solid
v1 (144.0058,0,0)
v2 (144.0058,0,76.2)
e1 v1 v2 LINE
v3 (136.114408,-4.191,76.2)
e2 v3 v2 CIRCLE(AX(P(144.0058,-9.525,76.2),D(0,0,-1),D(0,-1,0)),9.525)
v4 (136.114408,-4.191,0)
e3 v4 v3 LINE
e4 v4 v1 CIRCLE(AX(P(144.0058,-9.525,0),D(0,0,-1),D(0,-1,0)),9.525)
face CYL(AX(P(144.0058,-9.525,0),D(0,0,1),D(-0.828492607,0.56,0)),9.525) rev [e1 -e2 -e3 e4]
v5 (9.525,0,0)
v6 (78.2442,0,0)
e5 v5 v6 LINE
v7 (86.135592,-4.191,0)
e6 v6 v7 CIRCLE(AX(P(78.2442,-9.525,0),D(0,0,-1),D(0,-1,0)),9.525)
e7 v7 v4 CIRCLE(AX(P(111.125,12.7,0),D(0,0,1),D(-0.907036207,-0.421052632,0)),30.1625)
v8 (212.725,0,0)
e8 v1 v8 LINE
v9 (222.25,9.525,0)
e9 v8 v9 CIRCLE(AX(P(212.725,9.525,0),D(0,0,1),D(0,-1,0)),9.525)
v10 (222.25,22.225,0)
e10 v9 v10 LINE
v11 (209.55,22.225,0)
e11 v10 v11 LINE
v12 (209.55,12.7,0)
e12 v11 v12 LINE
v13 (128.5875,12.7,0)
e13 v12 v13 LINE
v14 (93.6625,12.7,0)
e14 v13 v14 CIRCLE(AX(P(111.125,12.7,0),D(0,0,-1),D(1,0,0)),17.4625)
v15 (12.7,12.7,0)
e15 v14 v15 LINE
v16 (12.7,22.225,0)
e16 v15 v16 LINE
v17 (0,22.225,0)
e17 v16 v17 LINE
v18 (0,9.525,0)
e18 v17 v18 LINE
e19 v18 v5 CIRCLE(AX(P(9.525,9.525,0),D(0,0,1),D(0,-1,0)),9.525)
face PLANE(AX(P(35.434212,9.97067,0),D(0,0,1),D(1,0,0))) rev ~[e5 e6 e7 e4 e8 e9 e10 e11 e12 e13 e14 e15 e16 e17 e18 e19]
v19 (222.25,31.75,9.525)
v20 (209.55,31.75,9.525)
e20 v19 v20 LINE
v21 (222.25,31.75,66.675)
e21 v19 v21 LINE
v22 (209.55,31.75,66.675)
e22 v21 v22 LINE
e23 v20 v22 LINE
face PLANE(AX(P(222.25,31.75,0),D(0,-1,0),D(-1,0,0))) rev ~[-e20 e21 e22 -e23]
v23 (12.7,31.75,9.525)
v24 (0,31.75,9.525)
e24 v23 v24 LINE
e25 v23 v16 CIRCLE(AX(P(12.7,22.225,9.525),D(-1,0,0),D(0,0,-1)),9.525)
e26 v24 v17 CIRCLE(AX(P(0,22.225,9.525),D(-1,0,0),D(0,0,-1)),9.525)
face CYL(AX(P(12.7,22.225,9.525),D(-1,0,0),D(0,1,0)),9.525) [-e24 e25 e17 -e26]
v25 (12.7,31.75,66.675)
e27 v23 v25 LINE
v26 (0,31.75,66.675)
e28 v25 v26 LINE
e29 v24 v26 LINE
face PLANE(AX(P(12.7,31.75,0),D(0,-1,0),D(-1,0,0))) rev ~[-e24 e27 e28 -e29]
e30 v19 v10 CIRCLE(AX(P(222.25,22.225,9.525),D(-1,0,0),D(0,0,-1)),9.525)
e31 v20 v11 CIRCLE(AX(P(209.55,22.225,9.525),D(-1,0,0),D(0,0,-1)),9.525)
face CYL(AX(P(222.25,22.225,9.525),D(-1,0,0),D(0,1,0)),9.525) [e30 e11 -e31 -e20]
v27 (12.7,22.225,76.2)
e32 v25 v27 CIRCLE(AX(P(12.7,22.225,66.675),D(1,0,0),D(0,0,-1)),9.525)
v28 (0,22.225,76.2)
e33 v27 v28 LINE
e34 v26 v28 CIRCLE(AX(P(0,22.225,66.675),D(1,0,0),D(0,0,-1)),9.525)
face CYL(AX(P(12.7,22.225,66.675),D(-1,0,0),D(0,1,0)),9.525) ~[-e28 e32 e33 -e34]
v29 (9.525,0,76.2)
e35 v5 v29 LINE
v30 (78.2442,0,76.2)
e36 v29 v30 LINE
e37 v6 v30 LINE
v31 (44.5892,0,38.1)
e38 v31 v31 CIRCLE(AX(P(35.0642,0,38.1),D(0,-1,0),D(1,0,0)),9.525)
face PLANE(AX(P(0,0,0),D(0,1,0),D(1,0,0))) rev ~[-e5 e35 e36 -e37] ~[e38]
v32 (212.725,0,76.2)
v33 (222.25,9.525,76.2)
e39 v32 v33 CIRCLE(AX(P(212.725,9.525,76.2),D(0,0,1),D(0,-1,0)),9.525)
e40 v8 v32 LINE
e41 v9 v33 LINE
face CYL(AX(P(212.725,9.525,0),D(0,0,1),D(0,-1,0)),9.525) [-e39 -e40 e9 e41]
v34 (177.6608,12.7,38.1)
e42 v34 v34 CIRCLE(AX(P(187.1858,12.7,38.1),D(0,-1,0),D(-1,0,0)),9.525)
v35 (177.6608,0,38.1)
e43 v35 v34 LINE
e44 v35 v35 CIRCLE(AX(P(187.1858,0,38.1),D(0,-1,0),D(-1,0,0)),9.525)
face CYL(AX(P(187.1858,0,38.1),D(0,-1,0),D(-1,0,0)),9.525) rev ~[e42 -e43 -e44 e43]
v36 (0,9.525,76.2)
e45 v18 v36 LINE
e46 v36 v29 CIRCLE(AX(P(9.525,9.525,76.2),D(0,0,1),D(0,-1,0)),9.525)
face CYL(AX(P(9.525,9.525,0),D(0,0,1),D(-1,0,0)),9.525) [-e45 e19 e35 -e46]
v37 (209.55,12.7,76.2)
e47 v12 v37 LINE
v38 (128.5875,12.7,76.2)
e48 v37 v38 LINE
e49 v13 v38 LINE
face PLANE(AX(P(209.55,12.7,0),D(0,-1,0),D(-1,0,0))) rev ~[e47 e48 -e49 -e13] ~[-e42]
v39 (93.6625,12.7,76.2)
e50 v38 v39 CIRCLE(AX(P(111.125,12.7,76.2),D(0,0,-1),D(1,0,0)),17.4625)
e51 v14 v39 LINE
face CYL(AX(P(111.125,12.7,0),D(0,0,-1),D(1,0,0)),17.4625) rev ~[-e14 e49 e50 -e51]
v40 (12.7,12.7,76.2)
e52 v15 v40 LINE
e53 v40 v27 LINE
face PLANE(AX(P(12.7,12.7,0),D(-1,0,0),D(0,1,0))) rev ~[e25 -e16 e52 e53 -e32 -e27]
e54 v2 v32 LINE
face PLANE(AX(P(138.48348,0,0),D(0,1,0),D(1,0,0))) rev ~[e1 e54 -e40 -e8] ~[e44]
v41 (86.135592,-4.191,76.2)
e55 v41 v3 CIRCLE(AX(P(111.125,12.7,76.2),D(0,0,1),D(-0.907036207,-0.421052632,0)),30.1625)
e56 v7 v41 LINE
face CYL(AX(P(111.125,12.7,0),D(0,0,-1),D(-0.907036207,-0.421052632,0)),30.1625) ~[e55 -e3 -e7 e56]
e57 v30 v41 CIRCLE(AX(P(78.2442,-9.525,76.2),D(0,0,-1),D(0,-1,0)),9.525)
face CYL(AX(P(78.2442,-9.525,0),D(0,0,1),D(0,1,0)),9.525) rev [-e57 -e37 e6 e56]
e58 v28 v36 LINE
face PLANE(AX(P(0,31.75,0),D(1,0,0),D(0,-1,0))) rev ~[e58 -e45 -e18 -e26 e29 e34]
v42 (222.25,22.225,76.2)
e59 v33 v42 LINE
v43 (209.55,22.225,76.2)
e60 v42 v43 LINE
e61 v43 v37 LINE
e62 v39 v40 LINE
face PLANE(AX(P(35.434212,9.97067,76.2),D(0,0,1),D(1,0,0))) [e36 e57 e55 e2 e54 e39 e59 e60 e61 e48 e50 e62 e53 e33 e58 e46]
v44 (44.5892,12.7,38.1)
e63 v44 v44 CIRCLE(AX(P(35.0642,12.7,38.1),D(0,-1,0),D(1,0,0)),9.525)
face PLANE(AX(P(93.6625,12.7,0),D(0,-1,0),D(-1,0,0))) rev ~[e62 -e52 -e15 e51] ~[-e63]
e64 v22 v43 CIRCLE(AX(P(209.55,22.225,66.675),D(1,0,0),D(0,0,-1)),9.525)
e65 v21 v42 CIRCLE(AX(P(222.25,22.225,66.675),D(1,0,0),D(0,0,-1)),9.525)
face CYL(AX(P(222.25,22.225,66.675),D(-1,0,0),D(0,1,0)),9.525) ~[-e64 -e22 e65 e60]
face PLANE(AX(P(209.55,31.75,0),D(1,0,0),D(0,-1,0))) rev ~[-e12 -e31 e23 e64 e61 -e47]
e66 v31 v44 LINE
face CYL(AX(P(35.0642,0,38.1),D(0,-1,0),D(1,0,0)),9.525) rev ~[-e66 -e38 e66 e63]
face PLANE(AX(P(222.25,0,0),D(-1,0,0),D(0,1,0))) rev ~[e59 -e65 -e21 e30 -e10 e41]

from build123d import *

# Parameters (mm, degrees)
F1_DEPTH = 76.2
F2_R     = 9.525
F4_R     = 9.525
F5_DEPTH = 25.4


with BuildPart() as f1:
    # F0 (on Top) → F1 (new body)
    with BuildSketch(Plane.XY):
        with BuildLine():
            Line((0, 31.75), (0, 0))
            Line((0, 0), (83.7665203959, 0))
            ThreePointArc((83.7665203959, 0), (81.671846117, 6.197067385), (80.9625, 12.7))
            Line((80.9625, 12.7), (12.7, 12.7))
            Line((12.7, 12.7), (12.7, 31.75))
            Line((12.7, 31.75), (0, 31.75))
        make_face()
        with BuildLine():
            ThreePointArc((80.9625, 12.7), (81.671846117, 6.197067385), (83.7665203959, 0))
            Line((83.7665203959, 0), (99.139637834, 0))
            ThreePointArc((99.139637834, 0), (95.0901427653, 5.7846359667), (93.6625, 12.7))
            Line((93.6625, 12.7), (80.9625, 12.7))
        make_face()
        with BuildLine():
            Line((99.139637834, 0), (83.7665203959, 0))
            ThreePointArc((83.7665203959, 0), (111.125, -17.4625), (138.4834796041, 0))
            Line((138.4834796041, 0), (123.110362166, 0))
            ThreePointArc((123.110362166, 0), (111.125, -4.7625), (99.139637834, 0))
        make_face()
        with BuildLine():
            ThreePointArc((141.2875, 12.7), (140.578153883, 6.197067385), (138.4834796041, 0))
            Line((138.4834796041, 0), (222.25, 0))
            Line((222.25, 0), (222.25, 31.75))
            Line((222.25, 31.75), (209.55, 31.75))
            Line((209.55, 31.75), (209.55, 12.7))
            Line((209.55, 12.7), (141.2875, 12.7))
        make_face()
        with BuildLine():
            Line((123.110362166, 0), (138.4834796041, 0))
            ThreePointArc((138.4834796041, 0), (140.578153883, 6.197067385), (141.2875, 12.7))
            Line((141.2875, 12.7), (128.5875, 12.7))
            ThreePointArc((128.5875, 12.7), (127.1598572347, 5.7846359667), (123.110362166, 0))
        make_face()
    extrude(amount=F1_DEPTH)

    # F2
    f2_edges = [f1.edges().sort_by_distance(p)[0] for p in [
        (0, 0, 38.1),
        (6.35, 31.75, 76.2),
        (215.9, 31.75, 76.2),
        (215.9, 31.75, 0),
        (6.35, 31.75, 0),
        (138.48348, 0, 38.1),
        (83.76652, 0, 38.1),
        (222.25, 0, 38.1),
    ]]
    fillet(f2_edges, radius=F2_R)

    # F4 (on face) + F3 (on face) → F5 (cut)
    with BuildSketch(Plane.XZ):
        with Locations((35.0641996562, 38.1)):
            Circle(F4_R)
    with BuildSketch(Plane.XZ):
        with BuildLine():
            ThreePointArc((196.7108003438, 38.1), (187.1858003438, 47.625), (177.6608003438, 38.1))
            ThreePointArc((177.6608003438, 38.1), (187.1858003438, 28.575), (196.7108003438, 38.1))
        make_face()
    extrude(amount=-F5_DEPTH, mode=Mode.SUBTRACT)


solid = f1.part
